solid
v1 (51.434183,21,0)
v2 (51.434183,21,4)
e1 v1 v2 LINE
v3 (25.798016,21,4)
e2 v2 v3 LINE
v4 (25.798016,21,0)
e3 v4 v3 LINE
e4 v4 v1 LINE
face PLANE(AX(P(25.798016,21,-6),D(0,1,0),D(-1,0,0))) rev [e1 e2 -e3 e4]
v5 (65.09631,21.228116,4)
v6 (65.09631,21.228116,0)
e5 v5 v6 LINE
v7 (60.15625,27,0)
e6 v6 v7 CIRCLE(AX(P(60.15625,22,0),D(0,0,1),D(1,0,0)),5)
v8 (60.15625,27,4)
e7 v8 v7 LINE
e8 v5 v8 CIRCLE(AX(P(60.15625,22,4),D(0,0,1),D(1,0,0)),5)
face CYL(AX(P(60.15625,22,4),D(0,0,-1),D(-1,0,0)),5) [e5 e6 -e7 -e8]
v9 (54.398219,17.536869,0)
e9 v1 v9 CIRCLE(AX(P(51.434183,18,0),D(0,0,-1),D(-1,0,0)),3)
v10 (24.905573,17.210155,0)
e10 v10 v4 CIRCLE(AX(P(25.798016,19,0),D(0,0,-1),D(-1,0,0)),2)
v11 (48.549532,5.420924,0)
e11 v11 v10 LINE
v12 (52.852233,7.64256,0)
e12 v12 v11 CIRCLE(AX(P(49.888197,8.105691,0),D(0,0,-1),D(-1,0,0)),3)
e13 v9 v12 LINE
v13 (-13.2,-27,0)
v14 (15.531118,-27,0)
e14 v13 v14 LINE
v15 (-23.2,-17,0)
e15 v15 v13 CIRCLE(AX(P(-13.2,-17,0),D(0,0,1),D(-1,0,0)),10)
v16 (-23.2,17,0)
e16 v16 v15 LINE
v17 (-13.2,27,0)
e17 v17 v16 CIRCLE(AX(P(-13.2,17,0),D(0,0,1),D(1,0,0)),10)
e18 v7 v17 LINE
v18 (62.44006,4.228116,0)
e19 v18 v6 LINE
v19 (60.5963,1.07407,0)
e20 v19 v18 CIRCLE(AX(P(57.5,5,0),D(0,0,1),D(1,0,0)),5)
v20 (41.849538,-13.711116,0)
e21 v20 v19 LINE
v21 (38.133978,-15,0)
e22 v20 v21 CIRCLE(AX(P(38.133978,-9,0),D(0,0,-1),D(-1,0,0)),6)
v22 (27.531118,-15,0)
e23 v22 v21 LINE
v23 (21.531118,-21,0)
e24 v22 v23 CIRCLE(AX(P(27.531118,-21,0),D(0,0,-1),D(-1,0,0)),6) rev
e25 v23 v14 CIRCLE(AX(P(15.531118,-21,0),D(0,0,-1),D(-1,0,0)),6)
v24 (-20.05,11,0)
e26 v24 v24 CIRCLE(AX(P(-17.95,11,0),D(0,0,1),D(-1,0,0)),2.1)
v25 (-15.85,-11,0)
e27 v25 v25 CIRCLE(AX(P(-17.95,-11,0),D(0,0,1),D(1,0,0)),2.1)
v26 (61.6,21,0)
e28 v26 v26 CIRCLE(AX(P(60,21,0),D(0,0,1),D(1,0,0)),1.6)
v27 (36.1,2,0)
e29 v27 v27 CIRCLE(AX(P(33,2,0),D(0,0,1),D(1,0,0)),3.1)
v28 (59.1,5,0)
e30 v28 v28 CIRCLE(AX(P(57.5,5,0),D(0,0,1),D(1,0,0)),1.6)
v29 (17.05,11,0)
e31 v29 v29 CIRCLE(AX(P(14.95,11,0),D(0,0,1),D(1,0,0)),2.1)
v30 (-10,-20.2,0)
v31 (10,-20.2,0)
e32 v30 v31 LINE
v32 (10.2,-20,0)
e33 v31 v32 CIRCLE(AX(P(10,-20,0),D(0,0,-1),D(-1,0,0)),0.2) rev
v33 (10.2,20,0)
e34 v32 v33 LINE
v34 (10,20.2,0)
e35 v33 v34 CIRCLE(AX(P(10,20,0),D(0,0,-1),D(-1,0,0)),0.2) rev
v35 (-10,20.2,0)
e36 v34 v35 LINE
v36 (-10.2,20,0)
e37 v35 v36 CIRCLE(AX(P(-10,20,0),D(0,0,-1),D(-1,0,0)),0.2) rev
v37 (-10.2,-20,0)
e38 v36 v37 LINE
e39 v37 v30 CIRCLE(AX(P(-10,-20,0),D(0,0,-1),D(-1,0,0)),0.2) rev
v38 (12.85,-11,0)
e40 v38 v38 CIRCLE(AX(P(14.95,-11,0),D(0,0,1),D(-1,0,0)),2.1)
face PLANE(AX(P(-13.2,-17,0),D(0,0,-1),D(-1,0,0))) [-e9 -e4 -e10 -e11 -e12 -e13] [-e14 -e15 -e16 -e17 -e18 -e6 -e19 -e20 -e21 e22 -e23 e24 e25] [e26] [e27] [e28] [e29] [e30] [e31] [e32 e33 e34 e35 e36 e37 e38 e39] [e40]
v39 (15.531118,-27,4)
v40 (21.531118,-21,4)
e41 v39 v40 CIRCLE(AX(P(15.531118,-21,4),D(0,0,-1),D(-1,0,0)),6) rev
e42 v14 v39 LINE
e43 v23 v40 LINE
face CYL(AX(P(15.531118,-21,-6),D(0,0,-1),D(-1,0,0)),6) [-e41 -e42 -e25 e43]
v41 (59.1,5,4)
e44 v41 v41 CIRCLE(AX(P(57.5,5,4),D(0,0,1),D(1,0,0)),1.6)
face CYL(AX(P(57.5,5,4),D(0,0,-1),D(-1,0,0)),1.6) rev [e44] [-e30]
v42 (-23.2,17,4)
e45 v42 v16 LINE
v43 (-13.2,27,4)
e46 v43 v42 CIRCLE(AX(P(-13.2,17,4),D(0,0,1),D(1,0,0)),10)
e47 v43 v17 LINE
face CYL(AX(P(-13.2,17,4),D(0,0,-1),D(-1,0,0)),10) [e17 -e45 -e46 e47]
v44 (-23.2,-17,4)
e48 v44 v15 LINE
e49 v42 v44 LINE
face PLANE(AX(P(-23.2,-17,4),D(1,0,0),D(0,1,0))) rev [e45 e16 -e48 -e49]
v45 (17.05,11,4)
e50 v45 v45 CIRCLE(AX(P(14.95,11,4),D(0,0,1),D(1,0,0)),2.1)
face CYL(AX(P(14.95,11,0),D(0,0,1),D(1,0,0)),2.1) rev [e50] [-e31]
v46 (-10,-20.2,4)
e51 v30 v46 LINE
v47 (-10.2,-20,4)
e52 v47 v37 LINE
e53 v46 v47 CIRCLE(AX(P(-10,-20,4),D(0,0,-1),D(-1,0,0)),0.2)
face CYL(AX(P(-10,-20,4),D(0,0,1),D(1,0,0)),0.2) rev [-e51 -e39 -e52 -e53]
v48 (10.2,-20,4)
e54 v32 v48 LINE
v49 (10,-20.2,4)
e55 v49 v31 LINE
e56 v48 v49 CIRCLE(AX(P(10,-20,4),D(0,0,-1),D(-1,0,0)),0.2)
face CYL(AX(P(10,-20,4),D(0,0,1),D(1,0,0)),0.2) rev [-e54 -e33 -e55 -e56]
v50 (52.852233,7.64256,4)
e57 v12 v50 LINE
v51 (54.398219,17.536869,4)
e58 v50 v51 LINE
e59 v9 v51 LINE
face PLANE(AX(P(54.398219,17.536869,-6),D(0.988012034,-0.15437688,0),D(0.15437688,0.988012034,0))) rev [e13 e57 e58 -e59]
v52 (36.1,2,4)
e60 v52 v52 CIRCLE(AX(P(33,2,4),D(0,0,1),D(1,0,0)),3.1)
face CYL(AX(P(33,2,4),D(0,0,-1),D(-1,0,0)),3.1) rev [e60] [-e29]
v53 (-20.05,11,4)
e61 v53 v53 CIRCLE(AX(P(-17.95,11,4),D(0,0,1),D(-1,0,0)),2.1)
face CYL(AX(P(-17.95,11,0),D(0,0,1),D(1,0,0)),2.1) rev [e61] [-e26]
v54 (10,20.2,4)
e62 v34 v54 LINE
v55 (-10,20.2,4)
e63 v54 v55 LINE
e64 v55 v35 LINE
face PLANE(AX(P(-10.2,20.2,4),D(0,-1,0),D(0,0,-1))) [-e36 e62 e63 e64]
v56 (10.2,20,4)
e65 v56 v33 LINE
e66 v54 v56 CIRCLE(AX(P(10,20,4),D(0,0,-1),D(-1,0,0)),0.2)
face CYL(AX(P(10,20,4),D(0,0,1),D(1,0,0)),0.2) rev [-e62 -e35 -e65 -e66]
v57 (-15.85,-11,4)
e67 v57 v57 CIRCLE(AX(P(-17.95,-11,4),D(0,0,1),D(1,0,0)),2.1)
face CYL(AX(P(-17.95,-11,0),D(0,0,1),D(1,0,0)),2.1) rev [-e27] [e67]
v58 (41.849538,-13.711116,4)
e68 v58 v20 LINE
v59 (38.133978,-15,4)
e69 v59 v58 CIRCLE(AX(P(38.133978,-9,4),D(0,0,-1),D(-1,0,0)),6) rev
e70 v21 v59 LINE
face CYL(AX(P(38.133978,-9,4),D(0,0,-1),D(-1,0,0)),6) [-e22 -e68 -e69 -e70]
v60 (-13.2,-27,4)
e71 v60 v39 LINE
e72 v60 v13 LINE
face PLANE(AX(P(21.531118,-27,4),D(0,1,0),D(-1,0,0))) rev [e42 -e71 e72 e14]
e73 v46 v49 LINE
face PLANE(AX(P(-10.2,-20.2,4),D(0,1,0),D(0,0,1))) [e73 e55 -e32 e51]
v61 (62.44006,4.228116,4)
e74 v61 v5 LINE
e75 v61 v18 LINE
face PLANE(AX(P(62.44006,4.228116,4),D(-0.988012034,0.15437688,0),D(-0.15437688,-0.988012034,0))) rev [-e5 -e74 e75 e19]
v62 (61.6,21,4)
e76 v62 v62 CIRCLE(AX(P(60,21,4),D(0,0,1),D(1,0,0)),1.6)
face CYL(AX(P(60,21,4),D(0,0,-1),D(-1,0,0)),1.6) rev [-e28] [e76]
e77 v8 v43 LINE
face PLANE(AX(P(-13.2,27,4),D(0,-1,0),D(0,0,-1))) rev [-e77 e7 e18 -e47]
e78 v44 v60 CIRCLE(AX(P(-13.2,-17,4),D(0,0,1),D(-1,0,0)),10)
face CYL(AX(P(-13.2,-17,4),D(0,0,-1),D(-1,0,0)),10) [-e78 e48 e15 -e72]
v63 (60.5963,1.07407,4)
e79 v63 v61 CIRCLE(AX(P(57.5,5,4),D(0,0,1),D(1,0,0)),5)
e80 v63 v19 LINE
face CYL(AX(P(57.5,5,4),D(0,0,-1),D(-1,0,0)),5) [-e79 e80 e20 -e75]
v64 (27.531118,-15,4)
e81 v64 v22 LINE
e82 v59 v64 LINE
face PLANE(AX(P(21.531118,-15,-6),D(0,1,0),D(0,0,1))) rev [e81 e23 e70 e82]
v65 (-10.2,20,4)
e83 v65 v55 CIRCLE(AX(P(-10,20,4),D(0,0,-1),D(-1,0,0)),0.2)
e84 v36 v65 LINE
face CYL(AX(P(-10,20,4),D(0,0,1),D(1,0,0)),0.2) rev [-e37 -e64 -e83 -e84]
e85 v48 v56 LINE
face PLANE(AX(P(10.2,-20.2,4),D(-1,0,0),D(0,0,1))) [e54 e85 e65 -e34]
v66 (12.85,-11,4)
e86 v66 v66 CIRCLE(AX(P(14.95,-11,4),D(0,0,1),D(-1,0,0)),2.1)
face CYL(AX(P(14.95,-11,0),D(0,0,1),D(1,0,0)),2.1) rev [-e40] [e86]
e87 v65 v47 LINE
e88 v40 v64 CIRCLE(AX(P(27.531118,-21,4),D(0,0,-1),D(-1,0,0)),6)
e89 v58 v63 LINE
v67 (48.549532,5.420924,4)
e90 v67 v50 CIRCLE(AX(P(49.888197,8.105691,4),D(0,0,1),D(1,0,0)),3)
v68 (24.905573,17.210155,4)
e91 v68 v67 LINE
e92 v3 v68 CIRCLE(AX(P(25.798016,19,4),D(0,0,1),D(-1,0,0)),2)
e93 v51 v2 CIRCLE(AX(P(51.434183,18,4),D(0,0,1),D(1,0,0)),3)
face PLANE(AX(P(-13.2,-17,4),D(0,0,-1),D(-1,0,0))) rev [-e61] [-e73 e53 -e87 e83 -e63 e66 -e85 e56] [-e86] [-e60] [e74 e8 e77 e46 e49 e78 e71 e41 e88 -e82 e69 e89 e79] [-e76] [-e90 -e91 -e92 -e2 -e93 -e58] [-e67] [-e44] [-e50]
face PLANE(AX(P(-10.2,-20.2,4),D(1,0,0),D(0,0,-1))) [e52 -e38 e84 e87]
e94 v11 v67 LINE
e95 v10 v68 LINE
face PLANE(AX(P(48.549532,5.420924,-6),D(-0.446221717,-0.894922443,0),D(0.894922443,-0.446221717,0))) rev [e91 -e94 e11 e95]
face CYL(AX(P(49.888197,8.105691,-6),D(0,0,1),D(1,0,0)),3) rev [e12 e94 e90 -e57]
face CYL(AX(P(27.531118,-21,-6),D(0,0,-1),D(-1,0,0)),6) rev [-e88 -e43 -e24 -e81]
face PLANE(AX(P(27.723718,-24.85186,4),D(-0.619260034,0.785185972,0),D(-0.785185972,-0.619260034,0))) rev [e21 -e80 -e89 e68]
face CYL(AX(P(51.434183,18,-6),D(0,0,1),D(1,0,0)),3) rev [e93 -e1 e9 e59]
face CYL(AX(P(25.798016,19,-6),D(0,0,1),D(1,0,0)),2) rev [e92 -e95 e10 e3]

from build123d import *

# Parameters (mm, degrees)
SKETCH_1_R          = 3.1
SKETCH_1_R_2        = 1.6
SKETCH_1_W          = 20.4
SKETCH_1_H          = 40.4
EXTRUDE_1_DEPTH     = 4
FILLET_1_R          = 0.2
SKETCH_2_R          = 2.1
CUT_EXTRUDE_1_DEPTH = 4
CUT_EXTRUDE_2_DEPTH = 10
SKETCH_4_W          = 44.796452611
SKETCH_4_H          = 12
CUT_EXTRUDE_3_DEPTH = 10
FILLET_2_R          = 6


with BuildPart() as part:
    # 草图1 → 凸台-拉伸1 (new body)
    with BuildSketch(Plane.XY):
        with BuildLine():
            Line((-13.2, 27), (60.15625, 27))
            ThreePointArc((60.15625, 27), (63.954895943, 25.251198086), (65.096310169, 21.228115599))
            Line((65.096310169, 21.228115599), (62.440060169, 4.228115599))
            ThreePointArc((62.440060169, 4.228115599), (61.816569536, 2.476663431), (60.596300169, 1.074070141))
            Line((60.596300169, 1.074070141), (27.72371786, -24.851859719))
            ThreePointArc((27.72371786, -24.851859719), (24.808418455, -26.447713935), (21.531117522, -27))
            Line((21.531117522, -27), (-13.2, -27))
            ThreePointArc((-13.2, -27), (-20.271067812, -24.071067812), (-23.2, -17))
            Line((-23.2, -17), (-23.2, 17))
            ThreePointArc((-23.2, 17), (-20.271067812, 24.071067812), (-13.2, 27))
        make_face()
        with Locations((33, 2)):
            Circle(SKETCH_1_R, mode=Mode.SUBTRACT)
        with Locations((60, 21)):
            Circle(SKETCH_1_R_2, mode=Mode.SUBTRACT)
        with Locations((57.5, 5)):
            Circle(SKETCH_1_R_2, mode=Mode.SUBTRACT)
        Rectangle(SKETCH_1_W, SKETCH_1_H, mode=Mode.SUBTRACT)
    extrude(amount=EXTRUDE_1_DEPTH)

    # 圆角1
    fillet_1_edges = [part.edges().sort_by_distance(p)[0] for p in [
        (-10.2, 20.2, 2),
        (-10.2, -20.2, 2),
        (10.2, -20.2, 2),
        (10.2, 20.2, 2),
    ]]
    fillet(fillet_1_edges, radius=FILLET_1_R)

    # 草图2 → 切除-拉伸1 (cut)
    with BuildSketch(Plane.XY.offset(4)):
        with Locations((14.95, 11)):
            Circle(SKETCH_2_R)
        with Locations(Location((14.95, -11, 0), (0, 0, 180))):
            Circle(SKETCH_2_R)
        with Locations((-17.95, -11)):
            Circle(SKETCH_2_R)
        with Locations(Location((-17.95, 11, 0), (0, 0, 180))):
            Circle(SKETCH_2_R)
    extrude(amount=-CUT_EXTRUDE_1_DEPTH, mode=Mode.SUBTRACT)

    # 草图3 → 切除-拉伸2 (cut)
    with BuildSketch(Plane.XY.offset(4)):
        with BuildLine():
            Line((25.798016292, 21), (51.43418263, 21))
            ThreePointArc((51.43418263, 21), (53.713370196, 19.950718852), (54.398218731, 17.536869359))
            Line((54.398218731, 17.536869359), (52.852232934, 7.642560256))
            ThreePointArc((52.852232934, 7.642560256), (51.264559821, 5.440053089), (48.549531682, 5.420923567))
            Line((48.549531682, 5.420923567), (24.905572858, 17.210155114))
            ThreePointArc((24.905572858, 17.210155114), (23.851263897, 19.458426781), (25.798016292, 21))
        make_face()
    extrude(amount=-CUT_EXTRUDE_2_DEPTH, mode=Mode.SUBTRACT)

    # 草图4 → 切除-拉伸3 (cut)
    with BuildSketch(Plane.XY.offset(4)):
        with Locations((43.929343828, -21)):
            Rectangle(SKETCH_4_W, SKETCH_4_H)
    extrude(amount=-CUT_EXTRUDE_3_DEPTH, mode=Mode.SUBTRACT)

    # 圆角2
    fillet_2_edges = [part.edges().sort_by_distance(p)[0] for p in [
        (40.215307217, -15, 2),
        (21.531117522, -27, 2),
        (21.531117522, -15, 2),
    ]]
    fillet(fillet_2_edges, radius=FILLET_2_R - 0.0001)  # a hair under: the kernel refuses the full size


solid = part.part
